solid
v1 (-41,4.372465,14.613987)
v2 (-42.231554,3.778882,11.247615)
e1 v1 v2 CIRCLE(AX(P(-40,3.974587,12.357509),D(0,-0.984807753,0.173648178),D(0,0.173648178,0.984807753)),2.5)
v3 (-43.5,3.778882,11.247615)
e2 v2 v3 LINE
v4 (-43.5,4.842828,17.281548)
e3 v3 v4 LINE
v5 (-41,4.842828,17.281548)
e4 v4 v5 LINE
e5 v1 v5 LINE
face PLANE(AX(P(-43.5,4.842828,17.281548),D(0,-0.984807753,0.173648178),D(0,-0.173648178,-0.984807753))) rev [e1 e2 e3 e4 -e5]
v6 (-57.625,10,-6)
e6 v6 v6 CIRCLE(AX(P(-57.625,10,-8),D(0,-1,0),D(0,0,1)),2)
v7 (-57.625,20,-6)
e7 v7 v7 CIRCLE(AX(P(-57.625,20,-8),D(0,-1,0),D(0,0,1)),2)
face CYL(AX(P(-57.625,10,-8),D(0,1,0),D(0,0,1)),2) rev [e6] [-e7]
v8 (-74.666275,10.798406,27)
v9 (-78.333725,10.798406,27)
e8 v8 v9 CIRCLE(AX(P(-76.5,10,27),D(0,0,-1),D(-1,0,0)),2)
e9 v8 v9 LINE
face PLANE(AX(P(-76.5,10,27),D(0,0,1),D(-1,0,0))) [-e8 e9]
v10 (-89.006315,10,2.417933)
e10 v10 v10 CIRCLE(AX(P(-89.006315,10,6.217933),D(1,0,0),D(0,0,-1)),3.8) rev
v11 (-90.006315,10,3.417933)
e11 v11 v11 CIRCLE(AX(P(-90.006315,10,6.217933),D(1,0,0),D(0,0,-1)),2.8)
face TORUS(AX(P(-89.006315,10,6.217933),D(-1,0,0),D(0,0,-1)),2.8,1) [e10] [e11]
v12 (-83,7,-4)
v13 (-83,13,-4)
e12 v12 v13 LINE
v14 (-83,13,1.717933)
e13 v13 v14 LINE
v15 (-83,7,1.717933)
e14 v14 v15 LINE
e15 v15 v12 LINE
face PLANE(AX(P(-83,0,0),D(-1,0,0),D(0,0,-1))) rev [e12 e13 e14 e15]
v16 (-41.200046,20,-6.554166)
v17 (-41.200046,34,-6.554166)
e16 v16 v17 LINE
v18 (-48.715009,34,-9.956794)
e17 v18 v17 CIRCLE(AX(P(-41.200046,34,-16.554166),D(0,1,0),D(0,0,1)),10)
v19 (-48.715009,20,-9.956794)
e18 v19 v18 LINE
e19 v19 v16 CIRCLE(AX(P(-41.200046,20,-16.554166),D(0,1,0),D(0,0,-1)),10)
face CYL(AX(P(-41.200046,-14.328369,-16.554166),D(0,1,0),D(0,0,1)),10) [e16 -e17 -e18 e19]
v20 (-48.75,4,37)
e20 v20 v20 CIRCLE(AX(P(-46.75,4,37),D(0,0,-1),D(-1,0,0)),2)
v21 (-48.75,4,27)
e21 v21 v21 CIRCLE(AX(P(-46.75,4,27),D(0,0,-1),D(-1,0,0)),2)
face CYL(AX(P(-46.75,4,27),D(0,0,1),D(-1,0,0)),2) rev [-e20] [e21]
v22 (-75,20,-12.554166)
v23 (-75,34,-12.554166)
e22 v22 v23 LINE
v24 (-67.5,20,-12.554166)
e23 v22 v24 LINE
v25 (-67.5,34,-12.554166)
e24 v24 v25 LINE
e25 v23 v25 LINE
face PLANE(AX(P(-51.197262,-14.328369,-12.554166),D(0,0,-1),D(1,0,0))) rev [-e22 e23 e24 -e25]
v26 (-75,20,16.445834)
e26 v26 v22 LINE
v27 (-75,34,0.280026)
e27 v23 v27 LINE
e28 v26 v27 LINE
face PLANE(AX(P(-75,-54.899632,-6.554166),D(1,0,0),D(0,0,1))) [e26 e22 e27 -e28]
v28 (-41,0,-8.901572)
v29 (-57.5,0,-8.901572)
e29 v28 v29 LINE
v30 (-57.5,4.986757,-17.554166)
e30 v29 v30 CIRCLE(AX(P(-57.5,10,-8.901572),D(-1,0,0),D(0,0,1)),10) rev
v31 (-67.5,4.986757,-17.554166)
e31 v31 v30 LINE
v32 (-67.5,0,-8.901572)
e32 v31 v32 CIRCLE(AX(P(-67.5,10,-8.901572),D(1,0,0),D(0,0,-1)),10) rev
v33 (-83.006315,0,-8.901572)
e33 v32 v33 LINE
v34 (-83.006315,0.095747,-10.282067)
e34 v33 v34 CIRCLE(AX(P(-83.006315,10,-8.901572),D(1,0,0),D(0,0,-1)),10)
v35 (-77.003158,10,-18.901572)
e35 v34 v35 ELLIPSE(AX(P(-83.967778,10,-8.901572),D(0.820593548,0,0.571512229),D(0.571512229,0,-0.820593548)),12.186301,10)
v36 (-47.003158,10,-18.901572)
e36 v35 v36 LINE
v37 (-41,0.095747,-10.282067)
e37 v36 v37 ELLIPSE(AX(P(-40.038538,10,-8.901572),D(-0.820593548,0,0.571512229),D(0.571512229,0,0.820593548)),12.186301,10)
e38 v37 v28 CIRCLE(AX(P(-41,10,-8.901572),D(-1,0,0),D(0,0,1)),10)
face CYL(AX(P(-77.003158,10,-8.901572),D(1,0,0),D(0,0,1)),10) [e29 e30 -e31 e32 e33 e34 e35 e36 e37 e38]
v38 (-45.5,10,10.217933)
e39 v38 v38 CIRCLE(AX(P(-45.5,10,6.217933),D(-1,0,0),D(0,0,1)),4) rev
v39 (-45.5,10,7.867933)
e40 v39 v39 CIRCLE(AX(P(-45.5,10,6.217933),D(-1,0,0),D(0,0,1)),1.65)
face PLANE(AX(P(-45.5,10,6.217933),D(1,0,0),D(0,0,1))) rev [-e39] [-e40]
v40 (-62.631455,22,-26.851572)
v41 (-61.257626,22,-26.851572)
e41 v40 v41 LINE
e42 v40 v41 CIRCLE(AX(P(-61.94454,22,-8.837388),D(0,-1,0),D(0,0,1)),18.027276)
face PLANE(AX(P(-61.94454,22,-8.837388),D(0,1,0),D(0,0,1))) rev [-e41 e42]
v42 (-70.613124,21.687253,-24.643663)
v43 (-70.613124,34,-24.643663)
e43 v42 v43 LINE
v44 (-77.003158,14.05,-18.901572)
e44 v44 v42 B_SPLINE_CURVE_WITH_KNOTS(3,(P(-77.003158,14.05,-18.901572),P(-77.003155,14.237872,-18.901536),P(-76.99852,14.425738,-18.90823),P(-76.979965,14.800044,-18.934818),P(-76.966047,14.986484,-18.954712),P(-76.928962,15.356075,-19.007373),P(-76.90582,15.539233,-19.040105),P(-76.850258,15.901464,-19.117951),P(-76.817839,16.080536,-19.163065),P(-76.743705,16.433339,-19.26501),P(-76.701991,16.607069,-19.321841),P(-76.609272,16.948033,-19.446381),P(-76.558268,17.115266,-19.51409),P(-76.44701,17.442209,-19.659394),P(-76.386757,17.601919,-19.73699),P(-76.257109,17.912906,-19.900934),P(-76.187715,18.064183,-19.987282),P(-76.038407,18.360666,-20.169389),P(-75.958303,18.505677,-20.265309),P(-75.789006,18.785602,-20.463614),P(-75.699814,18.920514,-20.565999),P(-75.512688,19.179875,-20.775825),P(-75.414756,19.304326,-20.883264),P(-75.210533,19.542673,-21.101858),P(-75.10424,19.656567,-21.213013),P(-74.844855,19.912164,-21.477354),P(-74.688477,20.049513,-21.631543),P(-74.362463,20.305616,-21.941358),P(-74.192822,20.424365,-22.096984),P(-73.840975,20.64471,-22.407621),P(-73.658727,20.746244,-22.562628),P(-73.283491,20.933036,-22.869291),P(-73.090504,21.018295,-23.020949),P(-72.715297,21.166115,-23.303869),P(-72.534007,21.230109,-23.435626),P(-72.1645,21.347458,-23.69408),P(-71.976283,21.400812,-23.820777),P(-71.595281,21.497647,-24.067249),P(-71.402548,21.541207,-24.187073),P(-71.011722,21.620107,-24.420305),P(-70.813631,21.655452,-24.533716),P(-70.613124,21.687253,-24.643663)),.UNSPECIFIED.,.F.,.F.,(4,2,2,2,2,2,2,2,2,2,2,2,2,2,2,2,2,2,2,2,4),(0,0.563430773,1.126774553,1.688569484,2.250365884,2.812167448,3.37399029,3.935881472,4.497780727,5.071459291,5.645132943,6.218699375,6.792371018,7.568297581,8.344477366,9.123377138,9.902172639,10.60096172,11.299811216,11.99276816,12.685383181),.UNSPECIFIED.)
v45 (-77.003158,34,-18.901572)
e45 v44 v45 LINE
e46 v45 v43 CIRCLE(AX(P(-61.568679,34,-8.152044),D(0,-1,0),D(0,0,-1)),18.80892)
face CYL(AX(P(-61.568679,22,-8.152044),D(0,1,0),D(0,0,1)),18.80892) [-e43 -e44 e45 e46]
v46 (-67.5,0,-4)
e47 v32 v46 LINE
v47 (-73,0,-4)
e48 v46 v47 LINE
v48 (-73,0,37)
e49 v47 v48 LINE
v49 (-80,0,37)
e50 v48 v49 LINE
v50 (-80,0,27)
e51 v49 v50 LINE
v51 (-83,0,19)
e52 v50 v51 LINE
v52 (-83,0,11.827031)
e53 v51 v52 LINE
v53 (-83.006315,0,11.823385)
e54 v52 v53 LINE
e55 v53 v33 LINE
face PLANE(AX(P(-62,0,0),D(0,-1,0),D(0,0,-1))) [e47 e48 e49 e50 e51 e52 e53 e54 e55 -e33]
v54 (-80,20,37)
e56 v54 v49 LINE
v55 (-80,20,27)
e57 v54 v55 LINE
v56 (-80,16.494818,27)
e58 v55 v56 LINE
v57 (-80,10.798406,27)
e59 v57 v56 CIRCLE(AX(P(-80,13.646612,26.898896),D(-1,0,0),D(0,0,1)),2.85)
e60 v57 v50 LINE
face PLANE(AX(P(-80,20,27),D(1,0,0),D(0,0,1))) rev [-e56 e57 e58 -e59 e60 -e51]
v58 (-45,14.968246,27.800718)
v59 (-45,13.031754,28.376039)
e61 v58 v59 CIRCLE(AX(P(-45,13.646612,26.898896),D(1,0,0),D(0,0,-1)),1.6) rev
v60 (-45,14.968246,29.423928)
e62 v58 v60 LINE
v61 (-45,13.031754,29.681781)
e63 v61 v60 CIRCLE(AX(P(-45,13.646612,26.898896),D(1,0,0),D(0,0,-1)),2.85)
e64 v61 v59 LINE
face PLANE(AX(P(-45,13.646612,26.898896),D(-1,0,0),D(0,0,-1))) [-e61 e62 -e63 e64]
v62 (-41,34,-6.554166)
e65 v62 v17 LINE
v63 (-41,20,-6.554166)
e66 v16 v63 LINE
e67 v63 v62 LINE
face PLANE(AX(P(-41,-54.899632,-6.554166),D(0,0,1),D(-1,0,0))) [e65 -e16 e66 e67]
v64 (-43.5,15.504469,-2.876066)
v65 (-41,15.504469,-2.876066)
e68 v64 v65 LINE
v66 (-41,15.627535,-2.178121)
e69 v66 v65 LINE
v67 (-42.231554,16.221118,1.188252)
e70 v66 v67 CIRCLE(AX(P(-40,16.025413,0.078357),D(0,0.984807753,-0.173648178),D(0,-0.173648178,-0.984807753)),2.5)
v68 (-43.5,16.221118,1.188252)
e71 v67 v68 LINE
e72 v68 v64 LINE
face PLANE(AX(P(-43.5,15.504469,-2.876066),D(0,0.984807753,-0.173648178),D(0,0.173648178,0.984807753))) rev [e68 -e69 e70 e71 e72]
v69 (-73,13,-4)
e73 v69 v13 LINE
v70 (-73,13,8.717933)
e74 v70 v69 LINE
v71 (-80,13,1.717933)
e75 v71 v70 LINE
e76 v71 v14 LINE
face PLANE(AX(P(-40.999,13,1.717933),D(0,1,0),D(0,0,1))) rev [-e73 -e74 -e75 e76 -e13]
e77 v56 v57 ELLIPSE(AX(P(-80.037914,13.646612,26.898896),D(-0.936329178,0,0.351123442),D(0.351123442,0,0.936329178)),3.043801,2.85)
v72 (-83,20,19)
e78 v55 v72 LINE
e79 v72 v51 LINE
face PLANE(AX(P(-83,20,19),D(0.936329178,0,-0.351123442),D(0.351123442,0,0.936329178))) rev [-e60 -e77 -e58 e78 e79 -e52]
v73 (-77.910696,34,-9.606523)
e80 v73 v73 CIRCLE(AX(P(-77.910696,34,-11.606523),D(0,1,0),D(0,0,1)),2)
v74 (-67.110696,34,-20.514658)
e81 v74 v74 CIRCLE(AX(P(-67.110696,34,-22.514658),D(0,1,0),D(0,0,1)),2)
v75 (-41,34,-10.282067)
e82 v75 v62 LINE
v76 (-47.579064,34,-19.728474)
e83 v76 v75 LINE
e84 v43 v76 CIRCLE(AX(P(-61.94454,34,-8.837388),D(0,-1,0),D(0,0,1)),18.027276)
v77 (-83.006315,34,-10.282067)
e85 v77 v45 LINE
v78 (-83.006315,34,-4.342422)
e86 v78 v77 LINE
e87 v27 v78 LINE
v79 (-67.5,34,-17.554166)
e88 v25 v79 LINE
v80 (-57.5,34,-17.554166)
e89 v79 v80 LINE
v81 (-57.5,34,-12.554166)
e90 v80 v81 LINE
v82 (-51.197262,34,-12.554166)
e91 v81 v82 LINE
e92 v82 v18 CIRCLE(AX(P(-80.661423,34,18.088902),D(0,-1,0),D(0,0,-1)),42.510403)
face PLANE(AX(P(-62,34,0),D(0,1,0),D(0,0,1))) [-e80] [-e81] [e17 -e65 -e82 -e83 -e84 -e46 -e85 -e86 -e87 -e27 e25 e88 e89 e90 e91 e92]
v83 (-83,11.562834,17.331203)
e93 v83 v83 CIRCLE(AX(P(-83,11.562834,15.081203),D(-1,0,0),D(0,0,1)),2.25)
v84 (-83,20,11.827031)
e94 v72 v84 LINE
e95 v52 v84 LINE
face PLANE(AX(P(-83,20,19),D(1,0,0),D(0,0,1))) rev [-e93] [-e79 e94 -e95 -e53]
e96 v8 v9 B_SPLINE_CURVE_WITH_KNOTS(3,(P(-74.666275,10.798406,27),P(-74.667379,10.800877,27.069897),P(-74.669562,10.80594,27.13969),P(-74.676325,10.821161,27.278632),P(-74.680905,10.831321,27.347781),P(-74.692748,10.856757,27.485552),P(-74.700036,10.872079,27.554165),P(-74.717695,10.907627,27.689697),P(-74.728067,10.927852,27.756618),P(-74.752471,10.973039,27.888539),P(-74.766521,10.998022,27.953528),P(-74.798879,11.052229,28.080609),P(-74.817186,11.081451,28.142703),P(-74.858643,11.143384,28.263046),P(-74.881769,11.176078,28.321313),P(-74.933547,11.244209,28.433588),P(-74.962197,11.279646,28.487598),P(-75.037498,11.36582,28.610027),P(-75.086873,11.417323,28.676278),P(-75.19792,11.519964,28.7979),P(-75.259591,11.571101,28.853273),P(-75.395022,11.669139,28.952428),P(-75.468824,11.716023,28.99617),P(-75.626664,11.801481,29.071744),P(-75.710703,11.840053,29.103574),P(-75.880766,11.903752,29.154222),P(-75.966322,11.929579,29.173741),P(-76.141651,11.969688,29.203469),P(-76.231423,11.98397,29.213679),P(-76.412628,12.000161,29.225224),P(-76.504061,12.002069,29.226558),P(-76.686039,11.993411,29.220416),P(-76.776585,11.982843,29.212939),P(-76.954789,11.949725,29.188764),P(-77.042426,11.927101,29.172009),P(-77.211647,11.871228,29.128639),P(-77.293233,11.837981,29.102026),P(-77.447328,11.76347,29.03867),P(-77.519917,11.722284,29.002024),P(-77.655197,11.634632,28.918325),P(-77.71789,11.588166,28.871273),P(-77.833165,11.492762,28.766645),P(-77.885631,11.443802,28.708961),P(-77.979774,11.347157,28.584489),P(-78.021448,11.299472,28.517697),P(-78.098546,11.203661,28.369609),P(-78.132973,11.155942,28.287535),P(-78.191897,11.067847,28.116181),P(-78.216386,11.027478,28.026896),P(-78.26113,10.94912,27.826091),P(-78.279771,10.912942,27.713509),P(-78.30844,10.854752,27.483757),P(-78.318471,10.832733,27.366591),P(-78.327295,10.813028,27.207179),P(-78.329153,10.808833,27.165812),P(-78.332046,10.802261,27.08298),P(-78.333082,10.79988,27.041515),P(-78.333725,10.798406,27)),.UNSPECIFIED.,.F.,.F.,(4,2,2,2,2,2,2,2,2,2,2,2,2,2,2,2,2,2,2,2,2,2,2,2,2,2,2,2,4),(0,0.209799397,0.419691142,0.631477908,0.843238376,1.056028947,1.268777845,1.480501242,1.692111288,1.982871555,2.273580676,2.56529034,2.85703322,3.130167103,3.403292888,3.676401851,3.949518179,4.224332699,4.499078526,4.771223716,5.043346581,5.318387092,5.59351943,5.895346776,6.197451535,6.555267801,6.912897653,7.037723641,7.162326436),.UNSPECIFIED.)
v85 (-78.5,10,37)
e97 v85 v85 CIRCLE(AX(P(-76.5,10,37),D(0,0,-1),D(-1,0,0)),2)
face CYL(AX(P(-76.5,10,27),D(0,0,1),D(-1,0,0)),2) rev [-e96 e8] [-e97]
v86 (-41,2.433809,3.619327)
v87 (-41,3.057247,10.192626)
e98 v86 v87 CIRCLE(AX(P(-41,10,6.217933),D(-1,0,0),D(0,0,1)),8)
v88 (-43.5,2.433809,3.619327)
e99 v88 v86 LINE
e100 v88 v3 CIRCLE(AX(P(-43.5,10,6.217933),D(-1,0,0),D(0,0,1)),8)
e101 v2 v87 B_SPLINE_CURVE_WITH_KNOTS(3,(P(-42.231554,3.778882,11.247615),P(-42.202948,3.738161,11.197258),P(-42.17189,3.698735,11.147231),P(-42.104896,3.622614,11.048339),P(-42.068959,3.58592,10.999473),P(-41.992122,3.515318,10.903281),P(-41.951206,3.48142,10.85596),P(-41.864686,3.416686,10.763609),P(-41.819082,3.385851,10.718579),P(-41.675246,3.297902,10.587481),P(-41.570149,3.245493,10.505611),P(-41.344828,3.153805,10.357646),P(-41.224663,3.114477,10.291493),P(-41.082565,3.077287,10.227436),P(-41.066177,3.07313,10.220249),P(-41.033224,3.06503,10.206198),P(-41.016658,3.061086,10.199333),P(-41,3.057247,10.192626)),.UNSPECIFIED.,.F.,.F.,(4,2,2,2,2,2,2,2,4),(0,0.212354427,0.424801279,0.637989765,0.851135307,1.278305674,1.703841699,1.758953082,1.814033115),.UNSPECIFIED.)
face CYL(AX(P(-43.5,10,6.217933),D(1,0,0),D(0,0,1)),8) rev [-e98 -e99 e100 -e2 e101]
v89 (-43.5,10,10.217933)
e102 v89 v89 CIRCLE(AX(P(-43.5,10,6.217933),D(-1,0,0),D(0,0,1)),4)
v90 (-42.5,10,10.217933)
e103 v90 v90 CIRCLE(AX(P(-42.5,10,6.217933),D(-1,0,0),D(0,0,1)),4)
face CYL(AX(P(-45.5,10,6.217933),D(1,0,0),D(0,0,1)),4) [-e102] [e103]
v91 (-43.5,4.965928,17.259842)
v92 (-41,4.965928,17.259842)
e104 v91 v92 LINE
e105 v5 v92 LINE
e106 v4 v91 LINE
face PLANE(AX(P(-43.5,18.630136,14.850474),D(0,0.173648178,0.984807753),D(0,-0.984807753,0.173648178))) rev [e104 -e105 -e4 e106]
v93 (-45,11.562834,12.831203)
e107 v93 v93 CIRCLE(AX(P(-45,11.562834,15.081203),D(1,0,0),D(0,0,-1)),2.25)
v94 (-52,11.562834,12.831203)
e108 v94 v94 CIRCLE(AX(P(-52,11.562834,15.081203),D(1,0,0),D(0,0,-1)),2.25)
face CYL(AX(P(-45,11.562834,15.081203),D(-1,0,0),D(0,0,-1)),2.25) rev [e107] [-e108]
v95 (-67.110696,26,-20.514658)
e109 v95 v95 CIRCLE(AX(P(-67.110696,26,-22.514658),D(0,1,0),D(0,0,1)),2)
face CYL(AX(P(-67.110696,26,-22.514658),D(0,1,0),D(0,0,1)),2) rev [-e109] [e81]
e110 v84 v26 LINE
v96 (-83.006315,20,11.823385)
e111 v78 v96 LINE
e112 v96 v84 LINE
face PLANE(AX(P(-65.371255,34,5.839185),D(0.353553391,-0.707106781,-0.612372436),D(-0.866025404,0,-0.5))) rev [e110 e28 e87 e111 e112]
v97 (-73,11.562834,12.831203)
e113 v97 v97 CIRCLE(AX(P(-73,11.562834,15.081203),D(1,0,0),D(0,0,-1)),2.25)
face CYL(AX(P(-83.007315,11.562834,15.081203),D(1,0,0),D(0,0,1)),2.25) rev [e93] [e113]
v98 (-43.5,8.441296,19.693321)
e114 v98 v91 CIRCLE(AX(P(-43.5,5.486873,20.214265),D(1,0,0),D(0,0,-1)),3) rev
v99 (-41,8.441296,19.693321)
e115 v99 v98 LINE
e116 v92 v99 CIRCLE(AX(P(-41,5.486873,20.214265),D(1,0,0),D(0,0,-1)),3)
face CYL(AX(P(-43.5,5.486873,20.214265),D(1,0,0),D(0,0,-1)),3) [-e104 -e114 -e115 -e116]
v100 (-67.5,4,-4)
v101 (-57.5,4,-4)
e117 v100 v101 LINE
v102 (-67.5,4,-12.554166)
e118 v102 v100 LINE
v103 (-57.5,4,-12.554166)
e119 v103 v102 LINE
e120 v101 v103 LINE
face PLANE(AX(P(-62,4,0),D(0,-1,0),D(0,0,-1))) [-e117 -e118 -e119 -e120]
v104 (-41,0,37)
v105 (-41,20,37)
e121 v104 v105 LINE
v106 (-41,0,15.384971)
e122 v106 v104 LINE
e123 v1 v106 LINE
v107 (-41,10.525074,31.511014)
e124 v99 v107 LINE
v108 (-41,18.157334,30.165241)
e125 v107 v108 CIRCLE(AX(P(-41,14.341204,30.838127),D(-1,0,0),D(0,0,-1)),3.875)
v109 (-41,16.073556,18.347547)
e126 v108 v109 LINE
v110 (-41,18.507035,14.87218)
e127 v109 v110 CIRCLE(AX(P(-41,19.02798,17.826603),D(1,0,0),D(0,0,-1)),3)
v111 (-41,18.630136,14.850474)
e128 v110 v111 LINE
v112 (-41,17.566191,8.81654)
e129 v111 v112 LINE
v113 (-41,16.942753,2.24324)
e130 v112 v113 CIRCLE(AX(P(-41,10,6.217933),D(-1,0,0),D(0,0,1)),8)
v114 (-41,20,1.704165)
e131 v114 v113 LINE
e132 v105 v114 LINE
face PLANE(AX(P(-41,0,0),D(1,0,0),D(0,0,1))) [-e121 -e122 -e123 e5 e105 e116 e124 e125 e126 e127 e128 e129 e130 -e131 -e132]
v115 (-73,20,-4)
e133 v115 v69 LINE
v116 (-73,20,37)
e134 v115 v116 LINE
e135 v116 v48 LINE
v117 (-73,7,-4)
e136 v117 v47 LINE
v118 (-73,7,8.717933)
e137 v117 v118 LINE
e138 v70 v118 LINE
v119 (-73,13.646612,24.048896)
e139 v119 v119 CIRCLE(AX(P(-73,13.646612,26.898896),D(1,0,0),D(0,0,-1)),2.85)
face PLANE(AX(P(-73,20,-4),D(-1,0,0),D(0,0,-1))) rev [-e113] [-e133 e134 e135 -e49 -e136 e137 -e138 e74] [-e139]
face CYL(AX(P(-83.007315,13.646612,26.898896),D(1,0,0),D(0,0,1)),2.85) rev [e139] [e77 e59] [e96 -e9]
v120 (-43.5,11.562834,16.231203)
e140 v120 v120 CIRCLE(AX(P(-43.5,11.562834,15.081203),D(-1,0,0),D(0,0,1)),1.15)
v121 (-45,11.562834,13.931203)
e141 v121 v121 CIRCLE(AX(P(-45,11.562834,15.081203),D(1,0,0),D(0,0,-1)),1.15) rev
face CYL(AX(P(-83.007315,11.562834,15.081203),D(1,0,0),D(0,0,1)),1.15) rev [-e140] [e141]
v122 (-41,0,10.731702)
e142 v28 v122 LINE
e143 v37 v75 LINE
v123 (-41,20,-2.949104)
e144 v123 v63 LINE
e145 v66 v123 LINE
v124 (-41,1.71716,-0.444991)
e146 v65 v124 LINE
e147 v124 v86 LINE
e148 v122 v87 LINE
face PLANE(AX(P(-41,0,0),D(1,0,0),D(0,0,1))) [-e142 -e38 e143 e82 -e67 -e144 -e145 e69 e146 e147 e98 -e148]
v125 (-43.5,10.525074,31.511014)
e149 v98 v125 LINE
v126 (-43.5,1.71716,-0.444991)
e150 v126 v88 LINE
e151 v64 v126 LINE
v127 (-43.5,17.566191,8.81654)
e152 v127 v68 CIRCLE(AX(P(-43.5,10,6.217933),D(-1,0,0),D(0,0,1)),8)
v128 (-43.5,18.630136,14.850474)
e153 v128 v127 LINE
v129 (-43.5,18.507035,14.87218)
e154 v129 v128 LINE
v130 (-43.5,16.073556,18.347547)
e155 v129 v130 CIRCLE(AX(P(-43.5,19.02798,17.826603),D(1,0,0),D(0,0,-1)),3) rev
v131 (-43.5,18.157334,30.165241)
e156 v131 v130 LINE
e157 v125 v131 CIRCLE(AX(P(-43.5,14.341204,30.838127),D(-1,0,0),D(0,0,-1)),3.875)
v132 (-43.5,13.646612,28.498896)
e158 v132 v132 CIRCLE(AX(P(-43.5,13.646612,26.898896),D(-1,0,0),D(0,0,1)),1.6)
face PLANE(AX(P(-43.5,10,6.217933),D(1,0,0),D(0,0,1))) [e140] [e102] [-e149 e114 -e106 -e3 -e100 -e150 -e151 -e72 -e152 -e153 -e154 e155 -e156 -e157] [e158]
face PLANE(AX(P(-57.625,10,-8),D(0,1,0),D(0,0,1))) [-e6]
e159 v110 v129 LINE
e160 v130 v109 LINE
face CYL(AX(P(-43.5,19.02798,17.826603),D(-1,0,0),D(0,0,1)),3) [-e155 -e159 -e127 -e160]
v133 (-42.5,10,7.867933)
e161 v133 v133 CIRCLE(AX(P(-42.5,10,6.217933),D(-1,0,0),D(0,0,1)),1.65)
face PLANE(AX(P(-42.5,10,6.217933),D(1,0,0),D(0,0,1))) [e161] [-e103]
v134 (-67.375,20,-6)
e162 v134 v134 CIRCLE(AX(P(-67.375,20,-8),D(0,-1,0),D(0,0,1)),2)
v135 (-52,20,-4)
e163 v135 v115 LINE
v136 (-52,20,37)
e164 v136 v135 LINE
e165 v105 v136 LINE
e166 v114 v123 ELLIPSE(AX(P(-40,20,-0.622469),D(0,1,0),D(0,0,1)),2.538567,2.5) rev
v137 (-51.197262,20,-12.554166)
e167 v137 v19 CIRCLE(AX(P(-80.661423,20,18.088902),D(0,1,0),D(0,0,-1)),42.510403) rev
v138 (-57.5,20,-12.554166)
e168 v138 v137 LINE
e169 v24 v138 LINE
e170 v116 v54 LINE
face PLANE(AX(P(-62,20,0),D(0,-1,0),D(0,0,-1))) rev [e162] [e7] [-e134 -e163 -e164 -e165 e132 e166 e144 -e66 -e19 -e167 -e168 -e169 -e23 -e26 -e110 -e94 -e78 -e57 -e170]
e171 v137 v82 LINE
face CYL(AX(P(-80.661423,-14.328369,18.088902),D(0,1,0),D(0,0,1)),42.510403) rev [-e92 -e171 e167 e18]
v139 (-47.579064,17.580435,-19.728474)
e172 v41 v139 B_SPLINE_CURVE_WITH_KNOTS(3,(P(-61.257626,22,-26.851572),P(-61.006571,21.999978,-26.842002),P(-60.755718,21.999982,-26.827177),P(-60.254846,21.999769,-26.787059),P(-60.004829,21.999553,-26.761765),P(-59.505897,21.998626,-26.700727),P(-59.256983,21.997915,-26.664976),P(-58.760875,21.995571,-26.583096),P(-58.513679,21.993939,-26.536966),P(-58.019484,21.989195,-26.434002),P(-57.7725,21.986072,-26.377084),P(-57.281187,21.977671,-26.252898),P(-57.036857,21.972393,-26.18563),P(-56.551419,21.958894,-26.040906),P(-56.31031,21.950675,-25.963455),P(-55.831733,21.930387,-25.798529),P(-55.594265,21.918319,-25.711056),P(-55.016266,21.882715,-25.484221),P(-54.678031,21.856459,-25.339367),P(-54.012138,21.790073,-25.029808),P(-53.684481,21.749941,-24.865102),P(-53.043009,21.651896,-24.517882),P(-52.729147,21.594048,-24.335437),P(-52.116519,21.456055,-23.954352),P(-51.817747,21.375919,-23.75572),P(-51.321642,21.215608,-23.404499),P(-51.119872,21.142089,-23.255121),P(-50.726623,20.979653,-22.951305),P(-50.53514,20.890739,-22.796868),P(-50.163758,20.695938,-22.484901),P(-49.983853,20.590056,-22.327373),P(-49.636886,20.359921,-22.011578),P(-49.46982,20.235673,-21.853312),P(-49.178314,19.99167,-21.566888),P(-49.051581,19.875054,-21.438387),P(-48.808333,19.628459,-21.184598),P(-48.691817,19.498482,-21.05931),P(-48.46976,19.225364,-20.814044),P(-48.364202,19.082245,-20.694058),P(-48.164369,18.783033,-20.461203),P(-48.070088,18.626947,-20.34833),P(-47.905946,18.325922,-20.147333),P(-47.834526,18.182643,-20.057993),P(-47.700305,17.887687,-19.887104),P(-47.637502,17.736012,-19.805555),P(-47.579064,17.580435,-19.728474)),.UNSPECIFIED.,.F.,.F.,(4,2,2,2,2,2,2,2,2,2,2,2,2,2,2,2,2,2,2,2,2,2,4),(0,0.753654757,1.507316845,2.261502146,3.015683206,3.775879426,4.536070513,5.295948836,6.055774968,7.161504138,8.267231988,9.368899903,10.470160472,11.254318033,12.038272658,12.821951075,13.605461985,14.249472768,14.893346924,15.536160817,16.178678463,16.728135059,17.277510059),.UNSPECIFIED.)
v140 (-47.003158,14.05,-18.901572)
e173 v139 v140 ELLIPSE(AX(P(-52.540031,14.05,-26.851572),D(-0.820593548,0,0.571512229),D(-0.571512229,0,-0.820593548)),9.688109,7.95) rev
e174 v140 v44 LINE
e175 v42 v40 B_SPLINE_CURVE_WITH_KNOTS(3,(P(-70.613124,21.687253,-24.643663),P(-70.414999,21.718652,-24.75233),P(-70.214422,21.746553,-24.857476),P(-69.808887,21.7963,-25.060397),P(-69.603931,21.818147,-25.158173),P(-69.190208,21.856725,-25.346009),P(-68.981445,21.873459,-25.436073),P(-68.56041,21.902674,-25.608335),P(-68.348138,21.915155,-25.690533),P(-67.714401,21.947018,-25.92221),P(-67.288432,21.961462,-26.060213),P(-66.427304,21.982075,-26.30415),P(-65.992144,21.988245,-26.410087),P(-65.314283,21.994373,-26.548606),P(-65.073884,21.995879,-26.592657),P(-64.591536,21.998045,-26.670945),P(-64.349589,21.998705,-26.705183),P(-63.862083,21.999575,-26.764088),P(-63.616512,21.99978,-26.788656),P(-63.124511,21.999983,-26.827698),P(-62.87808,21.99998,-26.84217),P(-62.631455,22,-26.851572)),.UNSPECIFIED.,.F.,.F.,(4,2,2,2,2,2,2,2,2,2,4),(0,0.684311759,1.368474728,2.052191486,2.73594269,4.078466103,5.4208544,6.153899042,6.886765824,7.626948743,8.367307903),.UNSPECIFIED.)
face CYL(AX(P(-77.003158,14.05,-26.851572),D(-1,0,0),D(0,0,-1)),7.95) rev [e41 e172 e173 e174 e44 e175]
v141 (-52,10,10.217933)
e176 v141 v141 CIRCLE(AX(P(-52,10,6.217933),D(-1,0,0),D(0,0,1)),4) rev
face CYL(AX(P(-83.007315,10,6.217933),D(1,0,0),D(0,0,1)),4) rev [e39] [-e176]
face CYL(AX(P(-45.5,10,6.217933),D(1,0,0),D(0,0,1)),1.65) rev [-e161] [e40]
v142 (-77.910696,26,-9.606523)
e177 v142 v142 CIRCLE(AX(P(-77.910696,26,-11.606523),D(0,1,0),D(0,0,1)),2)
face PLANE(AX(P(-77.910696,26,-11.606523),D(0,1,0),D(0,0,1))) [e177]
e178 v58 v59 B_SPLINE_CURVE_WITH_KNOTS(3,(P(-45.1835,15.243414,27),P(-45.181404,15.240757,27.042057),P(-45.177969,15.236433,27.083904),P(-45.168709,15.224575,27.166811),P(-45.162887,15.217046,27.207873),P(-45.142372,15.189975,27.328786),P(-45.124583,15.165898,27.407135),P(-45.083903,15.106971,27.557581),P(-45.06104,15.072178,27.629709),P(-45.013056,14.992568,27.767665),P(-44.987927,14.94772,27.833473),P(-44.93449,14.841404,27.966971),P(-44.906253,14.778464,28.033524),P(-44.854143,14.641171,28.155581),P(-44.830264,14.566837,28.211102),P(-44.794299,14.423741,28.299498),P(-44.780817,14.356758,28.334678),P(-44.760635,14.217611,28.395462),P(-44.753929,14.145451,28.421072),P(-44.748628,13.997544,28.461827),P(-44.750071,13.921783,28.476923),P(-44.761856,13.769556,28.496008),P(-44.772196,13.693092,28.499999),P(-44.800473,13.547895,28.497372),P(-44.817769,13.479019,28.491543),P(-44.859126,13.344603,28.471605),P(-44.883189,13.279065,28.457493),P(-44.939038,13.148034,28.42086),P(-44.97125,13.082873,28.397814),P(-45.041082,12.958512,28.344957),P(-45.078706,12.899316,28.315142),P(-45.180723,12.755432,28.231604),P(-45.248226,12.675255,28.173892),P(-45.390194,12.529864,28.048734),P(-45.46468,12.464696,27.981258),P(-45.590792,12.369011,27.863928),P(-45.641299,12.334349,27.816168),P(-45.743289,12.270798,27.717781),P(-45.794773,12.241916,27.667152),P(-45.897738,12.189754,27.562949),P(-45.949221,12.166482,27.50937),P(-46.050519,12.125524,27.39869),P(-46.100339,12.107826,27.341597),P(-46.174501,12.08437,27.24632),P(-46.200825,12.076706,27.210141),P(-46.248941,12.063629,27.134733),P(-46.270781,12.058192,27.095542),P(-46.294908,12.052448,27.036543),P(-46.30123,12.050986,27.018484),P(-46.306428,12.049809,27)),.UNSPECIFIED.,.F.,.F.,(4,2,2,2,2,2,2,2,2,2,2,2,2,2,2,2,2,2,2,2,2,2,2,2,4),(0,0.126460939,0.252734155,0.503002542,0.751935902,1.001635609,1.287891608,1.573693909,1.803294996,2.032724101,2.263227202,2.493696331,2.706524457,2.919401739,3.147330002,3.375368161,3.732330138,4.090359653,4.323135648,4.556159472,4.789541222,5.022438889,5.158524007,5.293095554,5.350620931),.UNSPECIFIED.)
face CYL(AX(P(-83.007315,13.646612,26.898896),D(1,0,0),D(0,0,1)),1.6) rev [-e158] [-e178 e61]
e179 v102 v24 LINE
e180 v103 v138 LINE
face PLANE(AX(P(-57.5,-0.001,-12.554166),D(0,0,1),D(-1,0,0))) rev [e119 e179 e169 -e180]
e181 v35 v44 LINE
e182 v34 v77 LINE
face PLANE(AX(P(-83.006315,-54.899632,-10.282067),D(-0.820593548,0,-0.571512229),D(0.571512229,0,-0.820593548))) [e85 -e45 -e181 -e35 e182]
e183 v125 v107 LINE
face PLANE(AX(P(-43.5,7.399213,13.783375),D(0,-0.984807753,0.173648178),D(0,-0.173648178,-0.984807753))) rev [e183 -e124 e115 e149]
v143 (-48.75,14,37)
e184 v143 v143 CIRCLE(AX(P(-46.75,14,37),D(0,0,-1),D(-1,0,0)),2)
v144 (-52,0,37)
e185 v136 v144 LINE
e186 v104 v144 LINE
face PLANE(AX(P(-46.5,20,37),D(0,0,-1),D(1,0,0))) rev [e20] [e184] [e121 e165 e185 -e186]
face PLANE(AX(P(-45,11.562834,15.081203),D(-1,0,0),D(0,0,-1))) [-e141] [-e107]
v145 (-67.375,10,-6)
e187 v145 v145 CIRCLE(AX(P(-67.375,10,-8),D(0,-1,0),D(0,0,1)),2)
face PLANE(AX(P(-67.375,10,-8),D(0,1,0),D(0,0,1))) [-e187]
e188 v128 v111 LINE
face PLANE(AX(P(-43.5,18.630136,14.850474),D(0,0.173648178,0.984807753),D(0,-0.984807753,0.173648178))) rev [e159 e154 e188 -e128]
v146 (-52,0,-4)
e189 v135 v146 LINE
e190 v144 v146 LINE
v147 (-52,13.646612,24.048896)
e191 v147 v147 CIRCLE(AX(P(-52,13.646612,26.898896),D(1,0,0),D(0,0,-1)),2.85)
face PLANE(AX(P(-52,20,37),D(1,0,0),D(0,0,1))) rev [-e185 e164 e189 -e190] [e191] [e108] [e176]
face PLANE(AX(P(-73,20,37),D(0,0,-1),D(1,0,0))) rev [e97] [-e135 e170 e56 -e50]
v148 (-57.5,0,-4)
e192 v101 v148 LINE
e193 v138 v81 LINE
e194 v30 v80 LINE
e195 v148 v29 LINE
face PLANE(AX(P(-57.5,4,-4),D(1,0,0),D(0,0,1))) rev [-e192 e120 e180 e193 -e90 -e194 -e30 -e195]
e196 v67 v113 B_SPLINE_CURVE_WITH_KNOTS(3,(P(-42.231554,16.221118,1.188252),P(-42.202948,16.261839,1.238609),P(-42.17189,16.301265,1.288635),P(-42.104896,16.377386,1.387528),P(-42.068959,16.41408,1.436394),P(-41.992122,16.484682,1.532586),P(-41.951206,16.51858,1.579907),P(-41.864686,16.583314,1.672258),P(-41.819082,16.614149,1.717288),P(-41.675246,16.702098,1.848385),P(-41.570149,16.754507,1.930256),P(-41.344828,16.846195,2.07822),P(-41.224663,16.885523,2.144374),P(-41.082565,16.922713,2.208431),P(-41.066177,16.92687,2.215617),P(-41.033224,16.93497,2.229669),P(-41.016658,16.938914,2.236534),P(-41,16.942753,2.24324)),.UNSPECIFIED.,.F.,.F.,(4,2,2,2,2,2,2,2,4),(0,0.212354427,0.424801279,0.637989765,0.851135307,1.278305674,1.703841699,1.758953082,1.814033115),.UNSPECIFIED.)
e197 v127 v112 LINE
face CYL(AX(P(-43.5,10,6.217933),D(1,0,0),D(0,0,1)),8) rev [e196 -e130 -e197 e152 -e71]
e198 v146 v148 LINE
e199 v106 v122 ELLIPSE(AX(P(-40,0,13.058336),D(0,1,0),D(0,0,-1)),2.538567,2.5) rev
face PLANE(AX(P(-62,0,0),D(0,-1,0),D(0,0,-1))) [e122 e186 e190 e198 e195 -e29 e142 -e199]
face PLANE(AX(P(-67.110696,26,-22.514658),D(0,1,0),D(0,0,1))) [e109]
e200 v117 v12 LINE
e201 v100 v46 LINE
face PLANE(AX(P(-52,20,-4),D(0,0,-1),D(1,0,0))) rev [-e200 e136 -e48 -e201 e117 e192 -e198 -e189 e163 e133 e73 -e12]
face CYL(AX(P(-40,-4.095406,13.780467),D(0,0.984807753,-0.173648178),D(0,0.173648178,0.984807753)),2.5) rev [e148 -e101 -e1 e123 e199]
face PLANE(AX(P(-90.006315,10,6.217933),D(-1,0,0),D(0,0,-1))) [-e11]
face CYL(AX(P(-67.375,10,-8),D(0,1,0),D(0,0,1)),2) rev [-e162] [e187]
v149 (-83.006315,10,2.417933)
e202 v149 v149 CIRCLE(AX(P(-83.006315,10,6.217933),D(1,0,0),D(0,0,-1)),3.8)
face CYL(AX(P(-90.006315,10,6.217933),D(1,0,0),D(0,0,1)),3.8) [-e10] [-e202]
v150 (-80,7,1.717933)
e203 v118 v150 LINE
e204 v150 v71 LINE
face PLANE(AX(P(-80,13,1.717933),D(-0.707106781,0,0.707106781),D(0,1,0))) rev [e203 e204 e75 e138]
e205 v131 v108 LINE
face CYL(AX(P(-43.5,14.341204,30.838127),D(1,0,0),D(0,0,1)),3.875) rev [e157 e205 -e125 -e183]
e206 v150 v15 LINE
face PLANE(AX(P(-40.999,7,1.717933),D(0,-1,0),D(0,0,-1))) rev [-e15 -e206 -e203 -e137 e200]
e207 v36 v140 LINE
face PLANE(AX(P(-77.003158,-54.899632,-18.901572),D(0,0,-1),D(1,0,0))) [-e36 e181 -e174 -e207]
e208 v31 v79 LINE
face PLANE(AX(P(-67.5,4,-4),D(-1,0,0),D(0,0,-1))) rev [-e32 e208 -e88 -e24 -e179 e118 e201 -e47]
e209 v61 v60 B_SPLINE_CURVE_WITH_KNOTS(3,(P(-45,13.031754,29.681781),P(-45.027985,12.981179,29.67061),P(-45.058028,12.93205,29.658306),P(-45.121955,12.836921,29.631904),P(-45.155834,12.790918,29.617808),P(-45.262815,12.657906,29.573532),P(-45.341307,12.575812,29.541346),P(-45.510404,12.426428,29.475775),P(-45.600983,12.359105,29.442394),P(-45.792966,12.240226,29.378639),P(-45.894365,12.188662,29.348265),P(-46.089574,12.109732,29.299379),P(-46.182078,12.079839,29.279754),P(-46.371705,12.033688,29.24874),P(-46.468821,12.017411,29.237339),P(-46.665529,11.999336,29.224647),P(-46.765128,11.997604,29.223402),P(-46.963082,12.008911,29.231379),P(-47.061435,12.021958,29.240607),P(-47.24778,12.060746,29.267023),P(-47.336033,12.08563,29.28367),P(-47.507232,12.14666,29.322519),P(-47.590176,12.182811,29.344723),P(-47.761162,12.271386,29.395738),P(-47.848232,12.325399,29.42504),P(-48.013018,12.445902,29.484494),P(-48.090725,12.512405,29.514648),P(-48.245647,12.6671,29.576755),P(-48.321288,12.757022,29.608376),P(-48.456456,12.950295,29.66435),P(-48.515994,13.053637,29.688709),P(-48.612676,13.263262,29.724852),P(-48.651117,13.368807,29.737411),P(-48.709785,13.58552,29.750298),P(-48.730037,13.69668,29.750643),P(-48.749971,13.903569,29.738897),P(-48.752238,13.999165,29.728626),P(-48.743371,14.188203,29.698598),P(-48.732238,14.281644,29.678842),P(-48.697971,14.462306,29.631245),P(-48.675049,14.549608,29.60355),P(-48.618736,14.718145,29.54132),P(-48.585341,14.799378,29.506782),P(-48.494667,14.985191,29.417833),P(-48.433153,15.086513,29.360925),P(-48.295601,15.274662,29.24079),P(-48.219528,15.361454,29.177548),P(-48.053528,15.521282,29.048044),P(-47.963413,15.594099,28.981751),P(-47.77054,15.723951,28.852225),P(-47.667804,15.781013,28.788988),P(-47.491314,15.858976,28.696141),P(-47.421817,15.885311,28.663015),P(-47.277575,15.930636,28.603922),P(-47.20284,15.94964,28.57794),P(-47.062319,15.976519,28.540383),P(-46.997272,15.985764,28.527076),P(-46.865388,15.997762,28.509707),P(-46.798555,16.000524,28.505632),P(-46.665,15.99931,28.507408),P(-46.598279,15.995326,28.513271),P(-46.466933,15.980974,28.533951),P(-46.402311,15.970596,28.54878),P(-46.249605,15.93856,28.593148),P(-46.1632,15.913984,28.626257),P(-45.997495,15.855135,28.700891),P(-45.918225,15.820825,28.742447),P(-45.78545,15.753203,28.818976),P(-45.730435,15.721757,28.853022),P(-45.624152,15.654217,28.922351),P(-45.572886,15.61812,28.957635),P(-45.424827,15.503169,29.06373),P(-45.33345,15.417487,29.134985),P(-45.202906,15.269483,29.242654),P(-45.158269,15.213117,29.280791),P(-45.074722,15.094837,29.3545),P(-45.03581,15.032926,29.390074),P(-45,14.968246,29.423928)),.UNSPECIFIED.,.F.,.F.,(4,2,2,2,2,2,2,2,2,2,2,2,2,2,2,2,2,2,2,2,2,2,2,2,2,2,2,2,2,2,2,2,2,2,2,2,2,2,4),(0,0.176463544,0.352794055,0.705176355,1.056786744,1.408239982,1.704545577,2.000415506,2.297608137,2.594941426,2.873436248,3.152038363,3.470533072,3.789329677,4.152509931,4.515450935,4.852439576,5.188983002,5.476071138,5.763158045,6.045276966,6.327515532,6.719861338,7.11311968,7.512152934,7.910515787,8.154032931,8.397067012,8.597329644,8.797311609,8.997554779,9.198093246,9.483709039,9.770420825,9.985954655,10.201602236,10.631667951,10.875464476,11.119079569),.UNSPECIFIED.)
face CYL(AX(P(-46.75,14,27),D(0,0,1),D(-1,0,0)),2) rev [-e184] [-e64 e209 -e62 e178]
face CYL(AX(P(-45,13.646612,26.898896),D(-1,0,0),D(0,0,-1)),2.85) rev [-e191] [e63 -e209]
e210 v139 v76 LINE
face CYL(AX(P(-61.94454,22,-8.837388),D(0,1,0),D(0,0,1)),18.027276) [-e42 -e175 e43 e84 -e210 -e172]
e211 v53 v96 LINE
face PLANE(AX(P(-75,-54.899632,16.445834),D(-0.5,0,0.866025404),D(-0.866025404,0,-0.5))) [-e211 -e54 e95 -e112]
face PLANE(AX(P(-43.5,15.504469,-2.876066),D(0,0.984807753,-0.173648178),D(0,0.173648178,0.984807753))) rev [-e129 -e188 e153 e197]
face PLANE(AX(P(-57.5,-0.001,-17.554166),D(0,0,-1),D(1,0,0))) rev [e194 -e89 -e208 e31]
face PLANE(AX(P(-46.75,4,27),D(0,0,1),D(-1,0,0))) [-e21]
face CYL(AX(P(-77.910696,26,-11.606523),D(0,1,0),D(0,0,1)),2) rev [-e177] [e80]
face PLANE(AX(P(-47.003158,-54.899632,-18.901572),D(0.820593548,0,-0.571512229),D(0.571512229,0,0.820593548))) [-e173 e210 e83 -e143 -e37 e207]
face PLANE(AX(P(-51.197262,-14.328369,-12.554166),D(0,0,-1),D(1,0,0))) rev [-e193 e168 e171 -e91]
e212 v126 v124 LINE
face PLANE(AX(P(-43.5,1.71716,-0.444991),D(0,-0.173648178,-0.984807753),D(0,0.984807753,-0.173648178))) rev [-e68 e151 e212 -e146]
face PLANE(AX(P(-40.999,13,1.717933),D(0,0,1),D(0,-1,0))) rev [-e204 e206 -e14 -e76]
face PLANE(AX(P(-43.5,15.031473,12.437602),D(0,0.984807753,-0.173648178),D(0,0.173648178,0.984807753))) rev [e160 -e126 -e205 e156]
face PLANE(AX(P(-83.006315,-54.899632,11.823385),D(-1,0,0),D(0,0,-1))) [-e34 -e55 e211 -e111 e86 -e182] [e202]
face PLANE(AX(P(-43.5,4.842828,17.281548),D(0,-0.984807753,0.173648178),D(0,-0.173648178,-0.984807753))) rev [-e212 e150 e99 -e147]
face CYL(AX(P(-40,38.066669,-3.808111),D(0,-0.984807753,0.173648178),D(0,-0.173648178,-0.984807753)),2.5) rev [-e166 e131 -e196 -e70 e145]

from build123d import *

# Parameters (mm, degrees)
BOSS_EXTRUDE1_DEPTH             = 20
SKETCH6_W                       = 25
SKETCH6_H                       = 20
BOSS_EXTRUDE5_DEPTH             = 5.5
BOSS_EXTRUDE11_START            = -20
BOSS_EXTRUDE11_DEPTH            = 34
SKETCH4_R                       = 2
CUT_EXTRUDE1_DEPTH              = 10
BOSS_EXTRUDE13_DEPTH            = 12
FILLET11_START                  = 14.0499999
FILLET11_DEPTH                  = 7.9500001
FILLET11_START_2                = -14.996842371
FILLET11_2_DEPTH                = 30.996842371
CHAMFER1_SIZE                   = 14
SKETCH26_W                      = 22
SKETCH26_H                      = 20
BOSS_EXTRUDE14_DEPTH            = 11
CUT_EXTRUDE7_DEPTH              = 2.5
CUT_EXTRUDE8_REACH              = 65.92
SKETCH27_R                      = 4
SKETCH27_R_2                    = 1.15
SKETCH27_R_3                    = 1.6
CUT_EXTRUDE9_DEPTH              = 2.5
CUT_EXTRUDE10_REACH             = 50.596
SKETCH29_R                      = 2.5
CUT_EXTRUDE11_REACH             = 55.607
SKETCH30_R                      = 2.5
BOSS_EXTRUDE15_DEPTH            = 1
BOSS_EXTRUDE15_DEPTH_BACK       = 2
SKETCH31_R                      = 4
SKETCH31_R_2                    = 1.65
SKETCH32_R                      = 2.85
SKETCH32_R_2                    = 2.25
CUT_EXTRUDE12_DEPTH             = 7
CUT_EXTRUDE12_DIRECTION_2_REACH = 61.046
SKETCH33_R                      = 3.8
BOSS_EXTRUDE17_DEPTH            = 7
FILLET17_R                      = 1
CUT_EXTRUDE13_DEPTH             = 14
SKETCH36_R                      = 2
CUT_EXTRUDE14_DEPTH             = 10
FILLET18_R                      = 10
CUT_EXTRUDE16_REACH             = 67.49
SKETCH37_W                      = 5.717933373
SKETCH37_H                      = 6
CHAMFER2_SIZE                   = 7
SKETCH38_W                      = 10
SKETCH38_H                      = 20
CUT_EXTRUDE17_DEPTH             = 4
CUT_EXTRUDE19_REACH             = 59.527
SKETCH39_W                      = 10
SKETCH39_H                      = 5
CUT_EXTRUDE20_DEPTH             = 112.274986141
CUT_EXTRUDE20_DEPTH_BACK        = 112.274986141
SKETCH40_W                      = 63.577932813
SKETCH40_H                      = 85.383198243
SKETCH41_R                      = 2
CUT_EXTRUDE21_DEPTH             = 8
FILLET19_R                      = 3


with BuildPart() as part:
    # Sketch1 → Boss-Extrude1 (new body)
    with BuildSketch(Plane(origin=(0, 0, 0), x_dir=(1, 0, 0), z_dir=(0, 1, 0))):
        Polygon((-15.5, -37), (-10, -37), (-10, 4), (11, 4), (11, -37), (18, -37), (18, -27), (21, -19), (21, 10), (-15.5, 10), align=None)
    extrude(amount=BOSS_EXTRUDE1_DEPTH)

    # Sketch6 → Boss-Extrude5 (add)
    with BuildSketch(Plane.ZY.offset(15.5)):
        with Locations((2.5, 10)):
            Rectangle(SKETCH6_W, SKETCH6_H)
    extrude(amount=BOSS_EXTRUDE5_DEPTH)

    # Sketch20 → Boss-Extrude11 (add)
    with BuildSketch(Plane(origin=(0, 20, 0), x_dir=(1, 0, 0), z_dir=(0, 1, 0)).offset(BOSS_EXTRUDE11_START)):
        Polygon((-21, 6.554166437), (13, 6.554166437), (13, -16.445833563), (21.006315459, -11.823385178), (21.006315459, 10.282066627), (15.003157729, 18.901571597), (-14.996842271, 18.901571597), (-21, 10.282066627), align=None)
    extrude(amount=BOSS_EXTRUDE11_DEPTH)

    # Sketch4 → Cut-Extrude1 (cut)
    with BuildSketch(Plane(origin=(0, 20, 0), x_dir=(1, 0, 0), z_dir=(0, 1, 0))):
        with Locations(Location((-4.375, 8, 0), (0, 0, 270))):
            Circle(SKETCH4_R)
        with Locations(Location((5.375, 8, 0), (0, 0, 270))):
            Circle(SKETCH4_R)
    extrude(amount=-CUT_EXTRUDE1_DEPTH, mode=Mode.SUBTRACT)

    # Sketch24 → Boss-Extrude13 (add)
    with BuildSketch(Plane(origin=(0, 34, 0), x_dir=(1, 0, 0), z_dir=(0, 1, 0))):
        with BuildLine():
            Line((-14.996842271, 18.901571597), (-14.420936492, 19.728473528))
            ThreePointArc((-14.420936492, 19.728473528), (-3.81756267, 26.467738085), (8.613124034, 24.643662635))
            ThreePointArc((8.613124034, 24.643662635), (12.140366622, 22.142331504), (15.003157729, 18.901571597))
            Line((15.003157729, 18.901571597), (21.006315459, 10.282066627))
            Line((21.006315459, 10.282066627), (21.006315459, 6.554166437))
            Line((21.006315459, 6.554166437), (-21, 6.554166437))
            Line((-21, 6.554166437), (-21, 10.282066627))
            Line((-21, 10.282066627), (-14.996842271, 18.901571597))
        make_face()
    extrude(amount=-BOSS_EXTRUDE13_DEPTH)

    # Fillet11: read off the stored shape, not the designer's step
    # Fillet11 outline → Fillet11 (add)
    with BuildSketch(Plane(origin=(0, 0, 0), x_dir=(1, 0, 0), z_dir=(0, 1, 0)).offset(FILLET11_START)):
        with BuildLine():
            Line((-14.996842271, 18.901571597), (15.003161757, 18.901565813))
            ThreePointArc((15.003161757, 18.901565813), (12.140369243, 22.142329149), (8.613124034, 24.643662635))
            ThreePointArc((8.613124034, 24.643662635), (-3.81756267, 26.467738085), (-14.420936492, 19.728473528))
            Line((-14.420936492, 19.728473528), (-14.996842271, 18.901571597))
        make_face()
    extrude(amount=FILLET11_DEPTH)

    # Fillet11 2 outline → Fillet11 2 (cut)
    with BuildSketch(Plane.YZ.offset(FILLET11_START_2)):
        with BuildLine():
            Line((22, -28), (22, -26.851571597))
            ThreePointArc((22, -26.851571597), (19.67149891, -21.230072687), (14.05, -18.901571597))
            Line((14.05, -18.901571597), (14.0499999, -28))
            Line((14.0499999, -28), (22, -28))
        make_face()
    extrude(amount=FILLET11_2_DEPTH, mode=Mode.SUBTRACT)

    # Chamfer1
    chamfer1_edges = [part.edges().sort_by_distance(p)[0] for p in [
        (17.003157729, 34, 14.134609371),
    ]]
    chamfer(chamfer1_edges, length=CHAMFER1_SIZE)

    # Sketch26 → Boss-Extrude14 (add)
    with BuildSketch(Plane.ZY.offset(21)):
        with Locations((26, 10)):
            Rectangle(SKETCH26_W, SKETCH26_H)
    extrude(amount=-BOSS_EXTRUDE14_DEPTH)

    # Sketch25 → Cut-Extrude7 (cut)
    with BuildSketch(Plane.ZY.offset(21)):
        with BuildLine():
            Line((12.437601752, 15.031473467), (30.16524051, 18.157334485))
            ThreePointArc((30.16524051, 18.157334485), (34.654257241, 15.01409113), (31.511013887, 10.525074399))
            Line((31.511013887, 10.525074399), (13.783375129, 7.399213382))
            ThreePointArc((13.783375129, 7.399213382), (-1.660528651, 8.610814579), (12.437601752, 15.031473467))
        make_face()
    extrude(amount=-CUT_EXTRUDE7_DEPTH, mode=Mode.SUBTRACT)

    # Sketch27 → Cut-Extrude8 (cut, up to next)
    with BuildSketch(Plane.ZY.offset(18.5), mode=Mode.PRIVATE) as cut_extrude8_sk1:
        with Locations((6.217933373, 10)):
            Circle(SKETCH27_R)
    cut_extrude8_tool1 = extrude(cut_extrude8_sk1.sketch, amount=-CUT_EXTRUDE8_REACH, mode=Mode.PRIVATE) & part.part
    # Sketch27 → Cut-Extrude8 (cut, up to next)
    with BuildSketch(Plane.ZY.offset(18.5), mode=Mode.PRIVATE) as cut_extrude8_sk2:
        with Locations((15.08120315, 11.562833599)):
            Circle(SKETCH27_R_2)
    cut_extrude8_tool2 = extrude(cut_extrude8_sk2.sketch, amount=-CUT_EXTRUDE8_REACH, mode=Mode.PRIVATE) & part.part
    # Sketch27 → Cut-Extrude8 (cut, up to next)
    with BuildSketch(Plane.ZY.offset(18.5), mode=Mode.PRIVATE) as cut_extrude8_sk3:
        with Locations((26.898896186, 13.646611731)):
            Circle(SKETCH27_R_3)
    cut_extrude8_tool3 = extrude(cut_extrude8_sk3.sketch, amount=-CUT_EXTRUDE8_REACH, mode=Mode.PRIVATE) & part.part
    add(cut_extrude8_tool1.solids().sort_by_distance((-18.5, 10, 6.217933))[0], mode=Mode.SUBTRACT)
    add(cut_extrude8_tool2.solids().sort_by_distance((-18.5, 11.562834, 15.081203))[0], mode=Mode.SUBTRACT)
    add(cut_extrude8_tool3.solids().sort_by_distance((-18.5, 13.646612, 26.898896))[0], mode=Mode.SUBTRACT)

    # Sketch28 → Cut-Extrude9 (cut)
    with BuildSketch(Plane.ZY.offset(21)):
        Polygon((-2.876065895, 15.50446885), (14.85047366, 18.630136048), (17.281548147, 4.842827506), (-0.444991407, 1.717160308), align=None)
    extrude(amount=-CUT_EXTRUDE9_DEPTH, mode=Mode.SUBTRACT)

    # Cut-Extrude10: up to this plane
    cut_extrude10_end = Plane(origin=(0, 20, 0), z_dir=(0, -1, 0))
    # Sketch29 → Cut-Extrude10 (cut, up to the surface)
    with BuildSketch(Plane(origin=(0, 15.528788143, -2.738144327), x_dir=(1, 0, 0), z_dir=(0, -0.9848077530122088, 0.17364817766692708)), mode=Mode.PRIVATE) as cut_extrude10_sk1:
        with Locations((-22, 2.85995077)):
            Circle(SKETCH29_R)
    cut_extrude10_tool1 = split(extrude(cut_extrude10_sk1.sketch, amount=-CUT_EXTRUDE10_REACH, mode=Mode.PRIVATE), bisect_by=cut_extrude10_end, keep=Keep.BOTH, mode=Mode.PRIVATE)
    add(cut_extrude10_tool1.solids().sort_by_distance((-22, 16.025413, 0.078357))[0], mode=Mode.SUBTRACT)

    # Cut-Extrude11: up to this plane
    cut_extrude11_end = Plane(origin=(0, 0, 0), z_dir=(0, -1, 0))
    # Sketch30 → Cut-Extrude11 (cut, up to the surface)
    with BuildSketch(Plane(origin=(0, 1.741479601, -0.30706984), x_dir=(1, 0, 0), z_dir=(0, 0.9848077530122086, -0.17364817766692728)), mode=Mode.PRIVATE) as cut_extrude11_sk1:
        with Locations((-22, -12.85995077)):
            Circle(SKETCH30_R)
    cut_extrude11_tool1 = split(extrude(cut_extrude11_sk1.sketch, amount=-CUT_EXTRUDE11_REACH, mode=Mode.PRIVATE), bisect_by=cut_extrude11_end, keep=Keep.BOTH, mode=Mode.PRIVATE)
    add(cut_extrude11_tool1.solids().sort_by_distance((-22, 3.974587, 12.357509))[0], mode=Mode.SUBTRACT)

    # Sketch31 → Boss-Extrude15 (add, two sides: drawn at the far end of the back side and taken through both)
    with BuildSketch(Plane.ZY.offset(18.5).offset(-BOSS_EXTRUDE15_DEPTH_BACK)):
        with Locations((6.217933373, 10)):
            Circle(SKETCH31_R)
        with Locations((6.217933373, 10)):
            Circle(SKETCH31_R_2, mode=Mode.SUBTRACT)
    extrude(amount=BOSS_EXTRUDE15_DEPTH + BOSS_EXTRUDE15_DEPTH_BACK)

    # Sketch32 → Cut-Extrude12 (cut)
    with BuildSketch(Plane(origin=(-10, 0, 0), x_dir=(0, 0, -1), z_dir=(1, 0, 0))):
        with Locations((-26.898896186, 13.646611731)):
            Circle(SKETCH32_R)
        with Locations((-15.08120315, 11.562833599)):
            Circle(SKETCH32_R_2)
    extrude(amount=-CUT_EXTRUDE12_DEPTH, mode=Mode.SUBTRACT)

    # Sketch32 → Cut-Extrude12 direction 2 (cut, up to next)
    with BuildSketch(Plane(origin=(-10, 0, 0), x_dir=(0, 0, -1), z_dir=(1, 0, 0)), mode=Mode.PRIVATE) as cut_extrude12_direction_2_sk1:
        with Locations((-26.898896186, 13.646611731)):
            Circle(SKETCH32_R)
    cut_extrude12_direction_2_tool1 = extrude(cut_extrude12_direction_2_sk1.sketch, amount=CUT_EXTRUDE12_DIRECTION_2_REACH, mode=Mode.PRIVATE) & part.part
    # Sketch32 → Cut-Extrude12 direction 2 (cut, up to next)
    with BuildSketch(Plane(origin=(-10, 0, 0), x_dir=(0, 0, -1), z_dir=(1, 0, 0)), mode=Mode.PRIVATE) as cut_extrude12_direction_2_sk2:
        with Locations((-15.08120315, 11.562833599)):
            Circle(SKETCH32_R_2)
    cut_extrude12_direction_2_tool2 = extrude(cut_extrude12_direction_2_sk2.sketch, amount=CUT_EXTRUDE12_DIRECTION_2_REACH, mode=Mode.PRIVATE) & part.part
    add(cut_extrude12_direction_2_tool1.solids().sort_by_distance((-10, 13.646612, 26.898896))[0], mode=Mode.SUBTRACT)
    add(cut_extrude12_direction_2_tool2.solids().sort_by_distance((-10, 11.562834, 15.081203))[0], mode=Mode.SUBTRACT)

    # Sketch33 → Boss-Extrude17 (add)
    with BuildSketch(Plane(origin=(21.006315459, 0, 0), x_dir=(0, 0, -1), z_dir=(1, 0, 0))):
        with Locations((-6.217933373, 10)):
            Circle(SKETCH33_R)
    extrude(amount=BOSS_EXTRUDE17_DEPTH)

    # Fillet17
    fillet17_edges = [part.edges().sort_by_distance(p)[0] for p in [
        (28.006315459, 10, 10.017933373),
    ]]
    fillet(fillet17_edges, radius=FILLET17_R)

    # Sketch35 → Cut-Extrude13 (cut)
    with BuildSketch(Plane(origin=(0, 34, 0), x_dir=(1, 0, 0), z_dir=(0, 1, 0))):
        with BuildLine():
            Line((-20.79995418, 6.554166437), (13, 6.554166437))
            Line((13, 6.554166437), (13, 12.554166437))
            Line((13, 12.554166437), (-10.802737675, 12.554166437))
            ThreePointArc((-10.802737675, 12.554166437), (-12.071315957, 11.281715365), (-13.284990593, 9.95679406))
            ThreePointArc((-13.284990593, 9.95679406), (-16.675255632, 7.444453934), (-20.79995418, 6.554166437))
        make_face()
    extrude(amount=-CUT_EXTRUDE13_DEPTH, mode=Mode.SUBTRACT)

    # Sketch36 → Cut-Extrude14 (cut)
    with BuildSketch(Plane.XY.offset(37)):
        with Locations((-15.25, 14)):
            Circle(SKETCH36_R)
        with Locations((14.5, 10)):
            Circle(SKETCH36_R)
        with Locations((-15.25, 4)):
            Circle(SKETCH36_R)
    extrude(amount=-CUT_EXTRUDE14_DEPTH, mode=Mode.SUBTRACT)

    # Fillet18
    fillet18_edges = [part.edges().sort_by_distance(p)[0] for p in [
        (0.003157729, 0, -18.901571597),
    ]]
    fillet(fillet18_edges, radius=FILLET18_R)

    # Sketch37 → Cut-Extrude16 (cut, up to next)
    with BuildSketch(Plane(origin=(21, 0, 0), x_dir=(0, 0, -1), z_dir=(1, 0, 0)), mode=Mode.PRIVATE) as cut_extrude16_sk1:
        with Locations((1.141033313, 10)):
            Rectangle(SKETCH37_W, SKETCH37_H)
    cut_extrude16_tool1 = extrude(cut_extrude16_sk1.sketch, amount=-CUT_EXTRUDE16_REACH, mode=Mode.PRIVATE) & part.part
    add(cut_extrude16_tool1.solids().sort_by_distance((21, 10, -1.141033))[0], mode=Mode.SUBTRACT)

    # Chamfer2
    chamfer2_edges = [part.edges().sort_by_distance(p)[0] for p in [
        (11, 10, 1.717933373),
    ]]
    chamfer(chamfer2_edges, length=CHAMFER2_SIZE)

    # Sketch38 → Cut-Extrude17 (cut)
    with BuildSketch(Plane.XZ):
        with Locations((0.5, -14)):
            Rectangle(SKETCH38_W, SKETCH38_H)
    extrude(amount=-CUT_EXTRUDE17_DEPTH, mode=Mode.SUBTRACT)

    # Sketch39 → Cut-Extrude19 (cut, up to next)
    with BuildSketch(Plane(origin=(0, 34, 0), x_dir=(1, 0, 0), z_dir=(0, 1, 0)), mode=Mode.PRIVATE) as cut_extrude19_sk1:
        with Locations((0.5, 15.054166437)):
            Rectangle(SKETCH39_W, SKETCH39_H)
    cut_extrude19_tool1 = extrude(cut_extrude19_sk1.sketch, amount=-CUT_EXTRUDE19_REACH, mode=Mode.PRIVATE) & part.part
    add(cut_extrude19_tool1.solids().sort_by_distance((0.5, 34, -15.054166))[0], mode=Mode.SUBTRACT)


with BuildPart() as body_2:
    # Mirror1: mirrored copy
    add(part.part.mirror(Plane.ZY.offset(31)))

    # Sketch41 → Cut-Extrude21 (cut)
    with BuildSketch(Plane(origin=(0, 34, 0), x_dir=(1, 0, 0), z_dir=(0, 1, 0))):
        with Locations(Location((-67.110696208, 22.514658427, 0), (0, 0, 270))):
            Circle(SKETCH41_R)
        with Locations(Location((-77.910696208, 11.606522541, 0), (0, 0, 270))):
            Circle(SKETCH41_R)
    extrude(amount=-CUT_EXTRUDE21_DEPTH, mode=Mode.SUBTRACT)

    # Fillet19
    fillet19_edges = [body_2.edges().sort_by_distance(p)[0] for p in [
        (-42.25, 15.55261182, 15.393124215),
        (-42.25, 7.920351734, 16.738897592),
    ]]
    fillet(fillet19_edges, radius=FILLET19_R)


with BuildPart() as part_1:
    add(part.part)

    # Sketch40 → Cut-Extrude20 (cut, two sides: drawn at the far end of the back side and taken through both)
    with BuildSketch(Plane(origin=(0, 0, -18.901571597), x_dir=(-1, 0, 0), z_dir=(0, 0, -1)).offset(-CUT_EXTRUDE20_DEPTH_BACK)):
        with Locations((-5.368663992, 38.471473394)):
            Rectangle(SKETCH40_W, SKETCH40_H)
    extrude(amount=CUT_EXTRUDE20_DEPTH + CUT_EXTRUDE20_DEPTH_BACK, mode=Mode.SUBTRACT)


solid = body_2.part
